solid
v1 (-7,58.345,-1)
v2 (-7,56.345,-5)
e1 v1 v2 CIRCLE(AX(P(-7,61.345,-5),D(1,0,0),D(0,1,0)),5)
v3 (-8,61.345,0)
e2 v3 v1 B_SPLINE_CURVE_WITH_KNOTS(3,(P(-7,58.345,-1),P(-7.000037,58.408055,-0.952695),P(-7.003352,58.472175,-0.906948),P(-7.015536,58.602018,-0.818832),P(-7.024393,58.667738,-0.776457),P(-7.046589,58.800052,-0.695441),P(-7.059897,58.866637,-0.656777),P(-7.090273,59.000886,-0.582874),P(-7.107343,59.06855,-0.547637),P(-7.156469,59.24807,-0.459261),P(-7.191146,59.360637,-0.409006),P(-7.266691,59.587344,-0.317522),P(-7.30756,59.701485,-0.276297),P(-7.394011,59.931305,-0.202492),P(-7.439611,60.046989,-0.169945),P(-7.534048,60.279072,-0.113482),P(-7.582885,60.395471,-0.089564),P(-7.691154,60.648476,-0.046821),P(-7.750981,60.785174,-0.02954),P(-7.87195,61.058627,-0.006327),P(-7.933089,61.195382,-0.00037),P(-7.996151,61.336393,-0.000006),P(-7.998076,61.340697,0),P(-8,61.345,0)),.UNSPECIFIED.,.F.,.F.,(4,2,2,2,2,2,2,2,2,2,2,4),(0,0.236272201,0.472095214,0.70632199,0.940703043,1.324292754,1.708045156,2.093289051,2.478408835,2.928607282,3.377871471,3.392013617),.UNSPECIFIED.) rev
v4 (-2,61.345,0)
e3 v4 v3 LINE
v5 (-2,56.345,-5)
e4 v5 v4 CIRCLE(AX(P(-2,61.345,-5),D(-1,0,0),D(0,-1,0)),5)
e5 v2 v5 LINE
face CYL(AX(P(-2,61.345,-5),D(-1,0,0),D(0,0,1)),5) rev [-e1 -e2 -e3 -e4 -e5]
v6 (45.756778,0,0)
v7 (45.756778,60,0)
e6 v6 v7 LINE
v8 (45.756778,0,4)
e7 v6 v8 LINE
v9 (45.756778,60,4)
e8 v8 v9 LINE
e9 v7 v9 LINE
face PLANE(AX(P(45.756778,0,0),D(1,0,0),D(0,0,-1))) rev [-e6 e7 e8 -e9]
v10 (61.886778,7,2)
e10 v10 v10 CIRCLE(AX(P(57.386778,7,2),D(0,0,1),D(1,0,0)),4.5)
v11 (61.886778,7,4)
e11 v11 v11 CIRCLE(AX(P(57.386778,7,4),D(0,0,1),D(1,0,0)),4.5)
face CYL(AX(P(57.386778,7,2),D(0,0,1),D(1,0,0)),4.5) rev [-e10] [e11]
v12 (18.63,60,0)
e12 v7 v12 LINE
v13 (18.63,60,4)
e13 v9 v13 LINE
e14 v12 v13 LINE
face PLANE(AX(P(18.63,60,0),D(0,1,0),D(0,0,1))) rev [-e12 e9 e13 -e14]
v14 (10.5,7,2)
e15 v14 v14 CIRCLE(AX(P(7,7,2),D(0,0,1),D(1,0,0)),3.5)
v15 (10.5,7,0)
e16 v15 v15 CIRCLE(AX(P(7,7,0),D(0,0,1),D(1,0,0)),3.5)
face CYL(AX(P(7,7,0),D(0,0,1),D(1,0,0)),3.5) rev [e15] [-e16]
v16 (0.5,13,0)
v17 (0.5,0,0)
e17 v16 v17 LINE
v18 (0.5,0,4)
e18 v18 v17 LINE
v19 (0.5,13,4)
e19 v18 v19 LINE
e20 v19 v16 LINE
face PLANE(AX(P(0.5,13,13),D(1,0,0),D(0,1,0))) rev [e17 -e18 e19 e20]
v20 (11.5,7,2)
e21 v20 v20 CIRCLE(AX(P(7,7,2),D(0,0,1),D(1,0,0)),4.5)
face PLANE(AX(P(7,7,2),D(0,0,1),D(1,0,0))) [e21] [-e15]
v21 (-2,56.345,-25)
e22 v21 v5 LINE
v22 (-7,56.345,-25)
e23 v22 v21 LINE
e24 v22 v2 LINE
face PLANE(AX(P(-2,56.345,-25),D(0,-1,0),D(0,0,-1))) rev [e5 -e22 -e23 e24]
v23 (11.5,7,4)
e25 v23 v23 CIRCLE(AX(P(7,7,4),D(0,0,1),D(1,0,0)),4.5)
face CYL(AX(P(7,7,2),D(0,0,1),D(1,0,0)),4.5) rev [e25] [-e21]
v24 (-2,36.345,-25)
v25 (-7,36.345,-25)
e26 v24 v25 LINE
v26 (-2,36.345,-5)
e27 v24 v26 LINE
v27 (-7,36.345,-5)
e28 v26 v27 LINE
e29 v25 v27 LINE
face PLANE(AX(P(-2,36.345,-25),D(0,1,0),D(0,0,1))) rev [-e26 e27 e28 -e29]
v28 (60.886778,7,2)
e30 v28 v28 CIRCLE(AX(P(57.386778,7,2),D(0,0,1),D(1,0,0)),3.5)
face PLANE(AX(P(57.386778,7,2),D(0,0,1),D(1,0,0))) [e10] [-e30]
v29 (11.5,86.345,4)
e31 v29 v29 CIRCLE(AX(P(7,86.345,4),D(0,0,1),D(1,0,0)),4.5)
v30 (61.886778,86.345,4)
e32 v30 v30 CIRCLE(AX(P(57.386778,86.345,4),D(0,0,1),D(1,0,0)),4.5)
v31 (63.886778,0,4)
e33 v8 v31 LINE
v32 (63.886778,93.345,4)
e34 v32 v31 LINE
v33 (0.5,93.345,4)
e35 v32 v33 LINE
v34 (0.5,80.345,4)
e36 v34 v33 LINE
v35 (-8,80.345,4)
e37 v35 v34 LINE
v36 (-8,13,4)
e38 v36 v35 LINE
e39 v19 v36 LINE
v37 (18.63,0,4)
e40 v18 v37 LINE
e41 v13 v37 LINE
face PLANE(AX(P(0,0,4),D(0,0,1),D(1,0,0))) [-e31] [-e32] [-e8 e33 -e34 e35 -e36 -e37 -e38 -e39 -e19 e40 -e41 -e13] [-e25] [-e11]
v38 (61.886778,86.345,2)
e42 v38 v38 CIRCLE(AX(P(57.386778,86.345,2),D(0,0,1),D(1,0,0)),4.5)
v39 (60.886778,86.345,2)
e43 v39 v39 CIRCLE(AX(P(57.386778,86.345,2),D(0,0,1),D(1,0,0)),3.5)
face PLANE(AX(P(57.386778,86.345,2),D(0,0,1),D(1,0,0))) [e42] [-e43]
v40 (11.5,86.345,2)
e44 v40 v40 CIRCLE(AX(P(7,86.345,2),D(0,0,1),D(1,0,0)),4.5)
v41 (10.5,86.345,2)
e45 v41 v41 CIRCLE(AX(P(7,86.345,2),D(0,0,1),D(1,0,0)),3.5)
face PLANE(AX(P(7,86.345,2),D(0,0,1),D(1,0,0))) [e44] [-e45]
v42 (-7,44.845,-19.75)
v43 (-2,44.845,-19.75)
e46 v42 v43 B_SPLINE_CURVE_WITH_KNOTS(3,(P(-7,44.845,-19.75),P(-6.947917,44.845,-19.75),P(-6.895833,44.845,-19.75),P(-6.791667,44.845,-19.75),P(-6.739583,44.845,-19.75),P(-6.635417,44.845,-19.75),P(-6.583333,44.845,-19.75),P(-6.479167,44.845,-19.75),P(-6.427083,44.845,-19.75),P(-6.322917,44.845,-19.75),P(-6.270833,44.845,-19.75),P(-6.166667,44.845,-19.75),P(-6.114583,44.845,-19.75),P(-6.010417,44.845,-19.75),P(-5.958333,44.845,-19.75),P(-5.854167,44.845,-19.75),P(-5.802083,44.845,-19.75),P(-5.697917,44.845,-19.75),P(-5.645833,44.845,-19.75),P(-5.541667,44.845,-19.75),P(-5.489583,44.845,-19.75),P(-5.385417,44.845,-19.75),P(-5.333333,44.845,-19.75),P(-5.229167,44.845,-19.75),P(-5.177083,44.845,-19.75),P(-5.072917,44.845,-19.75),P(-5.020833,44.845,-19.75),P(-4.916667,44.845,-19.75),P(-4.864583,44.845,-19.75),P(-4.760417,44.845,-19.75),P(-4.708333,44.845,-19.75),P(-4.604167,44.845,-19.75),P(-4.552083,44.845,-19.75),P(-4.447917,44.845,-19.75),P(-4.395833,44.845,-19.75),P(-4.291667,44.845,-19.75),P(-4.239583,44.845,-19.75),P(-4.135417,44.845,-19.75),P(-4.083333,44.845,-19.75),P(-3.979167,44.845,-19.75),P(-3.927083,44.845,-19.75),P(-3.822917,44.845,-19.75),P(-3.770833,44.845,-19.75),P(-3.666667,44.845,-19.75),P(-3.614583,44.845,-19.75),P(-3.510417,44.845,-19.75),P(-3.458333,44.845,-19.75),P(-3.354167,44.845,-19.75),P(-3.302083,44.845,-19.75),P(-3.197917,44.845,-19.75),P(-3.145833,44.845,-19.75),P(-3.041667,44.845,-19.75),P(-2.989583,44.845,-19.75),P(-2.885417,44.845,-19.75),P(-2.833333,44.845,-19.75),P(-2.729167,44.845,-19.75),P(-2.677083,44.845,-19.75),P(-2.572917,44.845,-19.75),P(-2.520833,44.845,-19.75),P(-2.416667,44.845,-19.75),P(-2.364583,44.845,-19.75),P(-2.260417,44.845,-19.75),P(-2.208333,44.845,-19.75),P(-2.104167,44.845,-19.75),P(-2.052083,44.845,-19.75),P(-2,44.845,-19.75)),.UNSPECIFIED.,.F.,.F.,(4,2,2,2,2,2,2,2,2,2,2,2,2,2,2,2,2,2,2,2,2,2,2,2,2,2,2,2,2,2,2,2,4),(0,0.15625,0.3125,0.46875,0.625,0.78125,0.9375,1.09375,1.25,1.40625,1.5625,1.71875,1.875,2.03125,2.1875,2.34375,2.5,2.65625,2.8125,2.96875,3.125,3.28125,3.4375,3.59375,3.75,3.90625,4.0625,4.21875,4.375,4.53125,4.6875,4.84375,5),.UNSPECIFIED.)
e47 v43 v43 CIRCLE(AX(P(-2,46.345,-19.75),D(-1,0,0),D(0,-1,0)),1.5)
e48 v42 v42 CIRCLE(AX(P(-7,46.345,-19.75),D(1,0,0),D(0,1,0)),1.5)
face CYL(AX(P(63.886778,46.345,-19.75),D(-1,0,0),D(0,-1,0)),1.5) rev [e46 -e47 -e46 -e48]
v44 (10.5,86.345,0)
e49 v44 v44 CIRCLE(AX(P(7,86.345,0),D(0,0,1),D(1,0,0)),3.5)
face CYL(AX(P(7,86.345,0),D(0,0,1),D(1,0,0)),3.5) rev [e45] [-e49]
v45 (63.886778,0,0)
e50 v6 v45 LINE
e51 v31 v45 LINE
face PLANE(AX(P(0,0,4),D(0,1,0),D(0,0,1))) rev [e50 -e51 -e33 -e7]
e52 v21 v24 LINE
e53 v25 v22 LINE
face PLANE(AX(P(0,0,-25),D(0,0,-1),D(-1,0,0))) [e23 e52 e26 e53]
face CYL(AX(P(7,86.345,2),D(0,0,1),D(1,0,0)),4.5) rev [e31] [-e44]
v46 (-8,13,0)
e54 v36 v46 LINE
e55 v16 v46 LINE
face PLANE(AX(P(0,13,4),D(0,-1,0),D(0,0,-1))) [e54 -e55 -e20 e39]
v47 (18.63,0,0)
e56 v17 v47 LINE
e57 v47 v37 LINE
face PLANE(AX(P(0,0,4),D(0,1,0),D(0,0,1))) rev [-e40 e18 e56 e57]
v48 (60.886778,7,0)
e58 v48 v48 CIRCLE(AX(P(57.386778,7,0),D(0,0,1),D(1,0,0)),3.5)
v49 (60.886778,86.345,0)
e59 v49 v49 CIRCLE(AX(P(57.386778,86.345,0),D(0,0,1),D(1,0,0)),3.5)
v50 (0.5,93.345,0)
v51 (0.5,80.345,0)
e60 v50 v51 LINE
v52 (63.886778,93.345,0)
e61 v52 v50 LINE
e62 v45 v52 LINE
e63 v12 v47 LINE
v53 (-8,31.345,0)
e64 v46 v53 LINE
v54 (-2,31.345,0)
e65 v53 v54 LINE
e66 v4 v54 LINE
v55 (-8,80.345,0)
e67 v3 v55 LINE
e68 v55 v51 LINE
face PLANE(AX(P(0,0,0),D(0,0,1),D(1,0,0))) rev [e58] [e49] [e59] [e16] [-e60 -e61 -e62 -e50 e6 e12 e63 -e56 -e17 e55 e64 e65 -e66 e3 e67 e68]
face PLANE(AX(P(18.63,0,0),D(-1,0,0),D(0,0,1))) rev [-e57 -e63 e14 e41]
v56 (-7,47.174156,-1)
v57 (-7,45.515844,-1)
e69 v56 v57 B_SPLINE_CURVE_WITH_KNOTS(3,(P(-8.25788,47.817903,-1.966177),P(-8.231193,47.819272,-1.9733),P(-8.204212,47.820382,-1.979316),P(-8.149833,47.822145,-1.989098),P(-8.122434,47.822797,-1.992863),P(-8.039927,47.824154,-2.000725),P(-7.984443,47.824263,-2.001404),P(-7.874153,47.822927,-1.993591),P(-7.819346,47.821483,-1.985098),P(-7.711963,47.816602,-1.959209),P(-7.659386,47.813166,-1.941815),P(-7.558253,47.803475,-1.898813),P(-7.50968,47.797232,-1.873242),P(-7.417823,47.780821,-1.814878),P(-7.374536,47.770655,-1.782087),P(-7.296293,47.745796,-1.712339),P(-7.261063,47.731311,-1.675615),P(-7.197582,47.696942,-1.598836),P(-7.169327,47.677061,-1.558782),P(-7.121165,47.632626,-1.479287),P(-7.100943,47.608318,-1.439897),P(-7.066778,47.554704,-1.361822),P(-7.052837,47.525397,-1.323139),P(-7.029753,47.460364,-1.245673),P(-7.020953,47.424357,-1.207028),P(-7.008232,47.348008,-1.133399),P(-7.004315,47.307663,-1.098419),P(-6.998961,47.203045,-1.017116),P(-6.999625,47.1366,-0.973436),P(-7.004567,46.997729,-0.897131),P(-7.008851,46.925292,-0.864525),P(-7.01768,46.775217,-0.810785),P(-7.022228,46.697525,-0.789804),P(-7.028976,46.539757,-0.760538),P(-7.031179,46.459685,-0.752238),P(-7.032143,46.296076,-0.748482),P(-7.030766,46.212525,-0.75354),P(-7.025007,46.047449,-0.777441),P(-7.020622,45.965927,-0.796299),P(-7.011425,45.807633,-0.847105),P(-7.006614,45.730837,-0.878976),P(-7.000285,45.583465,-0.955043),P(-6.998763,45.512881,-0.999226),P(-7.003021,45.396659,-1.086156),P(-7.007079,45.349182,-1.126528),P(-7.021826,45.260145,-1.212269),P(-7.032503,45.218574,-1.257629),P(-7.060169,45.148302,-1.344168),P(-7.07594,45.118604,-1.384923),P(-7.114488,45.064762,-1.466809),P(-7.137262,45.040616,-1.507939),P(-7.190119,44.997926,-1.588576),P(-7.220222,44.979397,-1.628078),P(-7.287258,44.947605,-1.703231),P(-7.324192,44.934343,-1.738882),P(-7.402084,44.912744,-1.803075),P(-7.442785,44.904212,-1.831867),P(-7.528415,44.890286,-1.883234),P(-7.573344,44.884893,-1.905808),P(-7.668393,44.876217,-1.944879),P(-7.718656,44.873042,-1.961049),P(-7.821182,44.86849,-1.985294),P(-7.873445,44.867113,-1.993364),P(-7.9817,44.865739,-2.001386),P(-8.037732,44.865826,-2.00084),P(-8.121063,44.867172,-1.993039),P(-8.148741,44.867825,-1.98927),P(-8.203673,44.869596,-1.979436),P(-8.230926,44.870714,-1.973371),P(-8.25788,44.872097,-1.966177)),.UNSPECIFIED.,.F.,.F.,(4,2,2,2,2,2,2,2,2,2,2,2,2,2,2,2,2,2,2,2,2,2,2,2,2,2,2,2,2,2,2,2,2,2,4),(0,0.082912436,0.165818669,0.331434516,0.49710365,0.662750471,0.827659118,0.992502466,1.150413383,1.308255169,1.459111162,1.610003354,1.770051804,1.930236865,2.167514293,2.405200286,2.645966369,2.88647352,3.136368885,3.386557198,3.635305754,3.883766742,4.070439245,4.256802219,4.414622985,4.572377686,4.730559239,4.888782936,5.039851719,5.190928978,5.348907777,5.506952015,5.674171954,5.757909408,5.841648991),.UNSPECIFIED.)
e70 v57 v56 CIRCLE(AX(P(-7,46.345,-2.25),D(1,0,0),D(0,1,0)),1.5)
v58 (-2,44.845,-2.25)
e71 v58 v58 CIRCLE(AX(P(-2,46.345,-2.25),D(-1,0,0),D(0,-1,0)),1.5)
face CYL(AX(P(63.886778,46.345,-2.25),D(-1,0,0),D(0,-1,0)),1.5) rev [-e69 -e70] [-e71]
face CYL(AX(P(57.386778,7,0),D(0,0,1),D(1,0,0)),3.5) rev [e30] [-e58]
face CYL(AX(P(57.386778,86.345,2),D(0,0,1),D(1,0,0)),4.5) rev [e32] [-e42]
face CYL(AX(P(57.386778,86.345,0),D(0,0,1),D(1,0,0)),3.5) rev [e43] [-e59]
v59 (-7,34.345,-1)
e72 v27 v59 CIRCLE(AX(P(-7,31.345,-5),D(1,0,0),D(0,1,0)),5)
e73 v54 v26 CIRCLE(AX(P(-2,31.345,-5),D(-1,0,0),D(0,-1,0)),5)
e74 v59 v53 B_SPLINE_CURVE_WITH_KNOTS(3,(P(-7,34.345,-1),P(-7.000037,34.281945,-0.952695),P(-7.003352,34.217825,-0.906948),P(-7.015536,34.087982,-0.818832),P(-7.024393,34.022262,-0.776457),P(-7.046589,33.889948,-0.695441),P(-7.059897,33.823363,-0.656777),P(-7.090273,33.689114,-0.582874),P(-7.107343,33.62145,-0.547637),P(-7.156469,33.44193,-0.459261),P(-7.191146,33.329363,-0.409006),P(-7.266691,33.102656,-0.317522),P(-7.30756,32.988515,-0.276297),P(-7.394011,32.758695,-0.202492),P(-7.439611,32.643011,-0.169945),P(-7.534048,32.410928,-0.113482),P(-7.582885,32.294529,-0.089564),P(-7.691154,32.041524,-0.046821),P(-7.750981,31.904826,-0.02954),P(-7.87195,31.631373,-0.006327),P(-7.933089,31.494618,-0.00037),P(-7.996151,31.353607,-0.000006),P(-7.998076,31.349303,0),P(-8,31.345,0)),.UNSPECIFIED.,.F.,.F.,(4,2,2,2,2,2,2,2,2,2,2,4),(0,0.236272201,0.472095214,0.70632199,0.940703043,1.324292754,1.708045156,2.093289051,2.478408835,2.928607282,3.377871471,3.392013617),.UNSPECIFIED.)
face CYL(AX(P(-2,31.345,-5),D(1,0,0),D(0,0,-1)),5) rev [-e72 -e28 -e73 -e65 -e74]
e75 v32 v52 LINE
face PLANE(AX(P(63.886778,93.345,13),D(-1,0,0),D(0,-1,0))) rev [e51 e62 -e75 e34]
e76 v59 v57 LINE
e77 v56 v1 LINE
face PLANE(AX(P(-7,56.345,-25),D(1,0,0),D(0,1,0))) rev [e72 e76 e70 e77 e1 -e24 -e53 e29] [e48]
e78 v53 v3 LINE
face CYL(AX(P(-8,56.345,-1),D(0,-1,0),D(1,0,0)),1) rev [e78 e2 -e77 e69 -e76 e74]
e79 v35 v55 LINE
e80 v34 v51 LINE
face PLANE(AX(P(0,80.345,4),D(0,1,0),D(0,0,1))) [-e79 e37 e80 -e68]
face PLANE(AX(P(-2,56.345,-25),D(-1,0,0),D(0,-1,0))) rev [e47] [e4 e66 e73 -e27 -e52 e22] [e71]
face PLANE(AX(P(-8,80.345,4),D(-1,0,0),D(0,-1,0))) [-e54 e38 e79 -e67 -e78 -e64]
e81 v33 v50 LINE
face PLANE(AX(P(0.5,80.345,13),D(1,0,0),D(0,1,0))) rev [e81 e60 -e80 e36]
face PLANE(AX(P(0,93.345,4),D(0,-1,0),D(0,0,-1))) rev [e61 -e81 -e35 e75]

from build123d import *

# Parameters (mm, degrees)
CROQUIS1_W                 = 64.38677758
CROQUIS1_H                 = 93.345
SALIENTE_EXTRUIR1_DEPTH    = 4
CROQUIS2_W                 = 27.12677758
CROQUIS2_H                 = 60
CORTAR_EXTRUIR1_DEPTH      = 114.467819897
CROQUIS5_R                 = 4.5
CORTAR_EXTRUIR3_DEPTH      = 2
CROQUIS6_R                 = 3.5
CORTAR_EXTRUIR4_DEPTH      = 114.414929141
CROQUIS7_W                 = 8
CROQUIS7_H                 = 67.345
SALIENTE_EXTRUIR4_DEPTH    = 4
CROQUIS8_W                 = 26.63
CROQUIS8_H                 = 67.345
SALIENTE_EXTRUIR5_DEPTH    = 2
CROQUIS9_W                 = 0.5
CROQUIS9_H                 = 93.345
CROQUIS9_H_2               = 13
CORTAR_EXTRUIR5_DEPTH      = 13
CROQUIS10_W                = 5
CROQUIS10_H                = 20
SALIENTE_EXTRUIR6_DEPTH    = 25
REDONDEO1_R                = 1
REDONDEO2_START            = -8.0000001
REDONDEO2_DEPTH            = 6.0000001
REDONDEO2_START_2          = 13
REDONDEO2_2_DEPTH          = 67.345
CORTAR_EXTRUIR6_DEPTH      = 120.846669794
CORTAR_EXTRUIR6_DEPTH_BACK = 120.846669794
CROQUIS11_R                = 1.5


with BuildPart() as part:
    # Croquis1 → Saliente-Extruir1 (new body)
    with BuildSketch(Plane.XY):
        with Locations((32.19338879, 46.6725)):
            Rectangle(CROQUIS1_W, CROQUIS1_H)
    extrude(amount=SALIENTE_EXTRUIR1_DEPTH)

    # Croquis2 → Cortar-Extruir1 (cut, through all)
    with BuildSketch(Plane.XY.offset(4)):
        with Locations((32.19338879, 30)):
            Rectangle(CROQUIS2_W, CROQUIS2_H)
    extrude(amount=-CORTAR_EXTRUIR1_DEPTH, mode=Mode.SUBTRACT)

    # Croquis5 → Cortar-Extruir3 (cut)
    with BuildSketch(Plane.XY.offset(4)):
        with Locations((57.38677758, 86.345)):
            Circle(CROQUIS5_R)
        with Locations((7, 86.345)):
            Circle(CROQUIS5_R)
        with Locations((57.38677758, 7)):
            Circle(CROQUIS5_R)
        with Locations((7, 7)):
            Circle(CROQUIS5_R)
    extrude(amount=-CORTAR_EXTRUIR3_DEPTH, mode=Mode.SUBTRACT)

    # Croquis6 → Cortar-Extruir4 (cut, through all)
    with BuildSketch(Plane.XY.offset(2)):
        with Locations((7, 86.345)):
            Circle(CROQUIS6_R)
        with Locations((57.38677758, 86.345)):
            Circle(CROQUIS6_R)
        with Locations((57.38677758, 7)):
            Circle(CROQUIS6_R)
        with Locations((7, 7)):
            Circle(CROQUIS6_R)
    extrude(amount=-CORTAR_EXTRUIR4_DEPTH, mode=Mode.SUBTRACT)

    # Croquis7 → Saliente-Extruir4 (add, through all)
    with BuildSketch(Plane(origin=(0, 0, 0), x_dir=(-1, 0, 0), z_dir=(0, 0, -1))):
        with Locations((4, 46.6725)):
            Rectangle(CROQUIS7_W, CROQUIS7_H)
    extrude(amount=-SALIENTE_EXTRUIR4_DEPTH)

    # Croquis8 → Saliente-Extruir5 (add)
    with BuildSketch(Plane(origin=(0, 0, 0), x_dir=(-1, 0, 0), z_dir=(0, 0, -1))):
        with Locations((-5.315, 46.6725)):
            Rectangle(CROQUIS8_W, CROQUIS8_H)
    extrude(amount=-SALIENTE_EXTRUIR5_DEPTH)

    # Croquis9 → Cortar-Extruir5 (cut)
    with BuildSketch(Plane(origin=(0, 0, 0), x_dir=(-1, 0, 0), z_dir=(0, 0, -1))):
        with Locations((-64.13677758, 46.6725)):
            Rectangle(CROQUIS9_W, CROQUIS9_H)
        with Locations((-0.25, 86.845)):
            Rectangle(CROQUIS9_W, CROQUIS9_H_2)
        with Locations((-0.25, 6.5)):
            Rectangle(CROQUIS9_W, CROQUIS9_H_2)
    extrude(amount=-CORTAR_EXTRUIR5_DEPTH, mode=Mode.SUBTRACT)

    # Croquis10 → Saliente-Extruir6 (add)
    with BuildSketch(Plane(origin=(0, 0, 0), x_dir=(-1, 0, 0), z_dir=(0, 0, -1))):
        with Locations((4.5, 46.345)):
            Rectangle(CROQUIS10_W, CROQUIS10_H)
    extrude(amount=SALIENTE_EXTRUIR6_DEPTH)

    # Redondeo1
    redondeo1_edges = [part.edges().sort_by_distance(p)[0] for p in [
        (-7, 46.345, 0),
    ]]
    fillet(redondeo1_edges, radius=REDONDEO1_R - 0.0001)  # a hair under: the kernel refuses the full size

    # Redondeo2: read off the stored shape, not the designer's step
    # Redondeo2 outline → Redondeo2 (add)
    with BuildSketch(Plane.YZ.offset(REDONDEO2_START)):
        with BuildLine():
            Line((56.345, 0), (56.345, -5))
            ThreePointArc((56.345, -5), (57.809466094, -1.464466094), (61.345, 0))
            Line((61.345, 0), (56.345, 0))
        make_face()
        with BuildLine():
            Line((36.345, -5), (36.345, 0))
            Line((36.345, 0), (31.345, 0))
            ThreePointArc((31.345, 0), (34.880533906, -1.464466094), (36.345, -5))
        make_face()
    extrude(amount=REDONDEO2_DEPTH)

    # Redondeo2 2 outline → Redondeo2 2 (cut)
    with BuildSketch(Plane(origin=(0, 0, 0), x_dir=(1, 0, 0), z_dir=(0, 1, 0)).offset(REDONDEO2_START_2)):
        with BuildLine():
            ThreePointArc((-8, 0), (-7.292893219, 0.292893219), (-7, 1))
            Line((-7, 1), (-6.999999997, 6))
            Line((-6.999999997, 6), (-8, 6))
            Line((-8, 6), (-8, 0))
        make_face()
    extrude(amount=REDONDEO2_2_DEPTH, mode=Mode.SUBTRACT)

    # Croquis11 → Cortar-Extruir6 (cut, two sides: drawn at the far end of the back side and taken through both)
    with BuildSketch(Plane.ZY.offset(7).offset(-CORTAR_EXTRUIR6_DEPTH_BACK)):
        with Locations(Location((-19.75, 46.345, 0), (0, 0, 270))):
            Circle(CROQUIS11_R)
        with Locations(Location((-2.25, 46.345, 0), (0, 0, 270))):
            Circle(CROQUIS11_R)
    extrude(amount=CORTAR_EXTRUIR6_DEPTH + CORTAR_EXTRUIR6_DEPTH_BACK, mode=Mode.SUBTRACT)


solid = part.part
